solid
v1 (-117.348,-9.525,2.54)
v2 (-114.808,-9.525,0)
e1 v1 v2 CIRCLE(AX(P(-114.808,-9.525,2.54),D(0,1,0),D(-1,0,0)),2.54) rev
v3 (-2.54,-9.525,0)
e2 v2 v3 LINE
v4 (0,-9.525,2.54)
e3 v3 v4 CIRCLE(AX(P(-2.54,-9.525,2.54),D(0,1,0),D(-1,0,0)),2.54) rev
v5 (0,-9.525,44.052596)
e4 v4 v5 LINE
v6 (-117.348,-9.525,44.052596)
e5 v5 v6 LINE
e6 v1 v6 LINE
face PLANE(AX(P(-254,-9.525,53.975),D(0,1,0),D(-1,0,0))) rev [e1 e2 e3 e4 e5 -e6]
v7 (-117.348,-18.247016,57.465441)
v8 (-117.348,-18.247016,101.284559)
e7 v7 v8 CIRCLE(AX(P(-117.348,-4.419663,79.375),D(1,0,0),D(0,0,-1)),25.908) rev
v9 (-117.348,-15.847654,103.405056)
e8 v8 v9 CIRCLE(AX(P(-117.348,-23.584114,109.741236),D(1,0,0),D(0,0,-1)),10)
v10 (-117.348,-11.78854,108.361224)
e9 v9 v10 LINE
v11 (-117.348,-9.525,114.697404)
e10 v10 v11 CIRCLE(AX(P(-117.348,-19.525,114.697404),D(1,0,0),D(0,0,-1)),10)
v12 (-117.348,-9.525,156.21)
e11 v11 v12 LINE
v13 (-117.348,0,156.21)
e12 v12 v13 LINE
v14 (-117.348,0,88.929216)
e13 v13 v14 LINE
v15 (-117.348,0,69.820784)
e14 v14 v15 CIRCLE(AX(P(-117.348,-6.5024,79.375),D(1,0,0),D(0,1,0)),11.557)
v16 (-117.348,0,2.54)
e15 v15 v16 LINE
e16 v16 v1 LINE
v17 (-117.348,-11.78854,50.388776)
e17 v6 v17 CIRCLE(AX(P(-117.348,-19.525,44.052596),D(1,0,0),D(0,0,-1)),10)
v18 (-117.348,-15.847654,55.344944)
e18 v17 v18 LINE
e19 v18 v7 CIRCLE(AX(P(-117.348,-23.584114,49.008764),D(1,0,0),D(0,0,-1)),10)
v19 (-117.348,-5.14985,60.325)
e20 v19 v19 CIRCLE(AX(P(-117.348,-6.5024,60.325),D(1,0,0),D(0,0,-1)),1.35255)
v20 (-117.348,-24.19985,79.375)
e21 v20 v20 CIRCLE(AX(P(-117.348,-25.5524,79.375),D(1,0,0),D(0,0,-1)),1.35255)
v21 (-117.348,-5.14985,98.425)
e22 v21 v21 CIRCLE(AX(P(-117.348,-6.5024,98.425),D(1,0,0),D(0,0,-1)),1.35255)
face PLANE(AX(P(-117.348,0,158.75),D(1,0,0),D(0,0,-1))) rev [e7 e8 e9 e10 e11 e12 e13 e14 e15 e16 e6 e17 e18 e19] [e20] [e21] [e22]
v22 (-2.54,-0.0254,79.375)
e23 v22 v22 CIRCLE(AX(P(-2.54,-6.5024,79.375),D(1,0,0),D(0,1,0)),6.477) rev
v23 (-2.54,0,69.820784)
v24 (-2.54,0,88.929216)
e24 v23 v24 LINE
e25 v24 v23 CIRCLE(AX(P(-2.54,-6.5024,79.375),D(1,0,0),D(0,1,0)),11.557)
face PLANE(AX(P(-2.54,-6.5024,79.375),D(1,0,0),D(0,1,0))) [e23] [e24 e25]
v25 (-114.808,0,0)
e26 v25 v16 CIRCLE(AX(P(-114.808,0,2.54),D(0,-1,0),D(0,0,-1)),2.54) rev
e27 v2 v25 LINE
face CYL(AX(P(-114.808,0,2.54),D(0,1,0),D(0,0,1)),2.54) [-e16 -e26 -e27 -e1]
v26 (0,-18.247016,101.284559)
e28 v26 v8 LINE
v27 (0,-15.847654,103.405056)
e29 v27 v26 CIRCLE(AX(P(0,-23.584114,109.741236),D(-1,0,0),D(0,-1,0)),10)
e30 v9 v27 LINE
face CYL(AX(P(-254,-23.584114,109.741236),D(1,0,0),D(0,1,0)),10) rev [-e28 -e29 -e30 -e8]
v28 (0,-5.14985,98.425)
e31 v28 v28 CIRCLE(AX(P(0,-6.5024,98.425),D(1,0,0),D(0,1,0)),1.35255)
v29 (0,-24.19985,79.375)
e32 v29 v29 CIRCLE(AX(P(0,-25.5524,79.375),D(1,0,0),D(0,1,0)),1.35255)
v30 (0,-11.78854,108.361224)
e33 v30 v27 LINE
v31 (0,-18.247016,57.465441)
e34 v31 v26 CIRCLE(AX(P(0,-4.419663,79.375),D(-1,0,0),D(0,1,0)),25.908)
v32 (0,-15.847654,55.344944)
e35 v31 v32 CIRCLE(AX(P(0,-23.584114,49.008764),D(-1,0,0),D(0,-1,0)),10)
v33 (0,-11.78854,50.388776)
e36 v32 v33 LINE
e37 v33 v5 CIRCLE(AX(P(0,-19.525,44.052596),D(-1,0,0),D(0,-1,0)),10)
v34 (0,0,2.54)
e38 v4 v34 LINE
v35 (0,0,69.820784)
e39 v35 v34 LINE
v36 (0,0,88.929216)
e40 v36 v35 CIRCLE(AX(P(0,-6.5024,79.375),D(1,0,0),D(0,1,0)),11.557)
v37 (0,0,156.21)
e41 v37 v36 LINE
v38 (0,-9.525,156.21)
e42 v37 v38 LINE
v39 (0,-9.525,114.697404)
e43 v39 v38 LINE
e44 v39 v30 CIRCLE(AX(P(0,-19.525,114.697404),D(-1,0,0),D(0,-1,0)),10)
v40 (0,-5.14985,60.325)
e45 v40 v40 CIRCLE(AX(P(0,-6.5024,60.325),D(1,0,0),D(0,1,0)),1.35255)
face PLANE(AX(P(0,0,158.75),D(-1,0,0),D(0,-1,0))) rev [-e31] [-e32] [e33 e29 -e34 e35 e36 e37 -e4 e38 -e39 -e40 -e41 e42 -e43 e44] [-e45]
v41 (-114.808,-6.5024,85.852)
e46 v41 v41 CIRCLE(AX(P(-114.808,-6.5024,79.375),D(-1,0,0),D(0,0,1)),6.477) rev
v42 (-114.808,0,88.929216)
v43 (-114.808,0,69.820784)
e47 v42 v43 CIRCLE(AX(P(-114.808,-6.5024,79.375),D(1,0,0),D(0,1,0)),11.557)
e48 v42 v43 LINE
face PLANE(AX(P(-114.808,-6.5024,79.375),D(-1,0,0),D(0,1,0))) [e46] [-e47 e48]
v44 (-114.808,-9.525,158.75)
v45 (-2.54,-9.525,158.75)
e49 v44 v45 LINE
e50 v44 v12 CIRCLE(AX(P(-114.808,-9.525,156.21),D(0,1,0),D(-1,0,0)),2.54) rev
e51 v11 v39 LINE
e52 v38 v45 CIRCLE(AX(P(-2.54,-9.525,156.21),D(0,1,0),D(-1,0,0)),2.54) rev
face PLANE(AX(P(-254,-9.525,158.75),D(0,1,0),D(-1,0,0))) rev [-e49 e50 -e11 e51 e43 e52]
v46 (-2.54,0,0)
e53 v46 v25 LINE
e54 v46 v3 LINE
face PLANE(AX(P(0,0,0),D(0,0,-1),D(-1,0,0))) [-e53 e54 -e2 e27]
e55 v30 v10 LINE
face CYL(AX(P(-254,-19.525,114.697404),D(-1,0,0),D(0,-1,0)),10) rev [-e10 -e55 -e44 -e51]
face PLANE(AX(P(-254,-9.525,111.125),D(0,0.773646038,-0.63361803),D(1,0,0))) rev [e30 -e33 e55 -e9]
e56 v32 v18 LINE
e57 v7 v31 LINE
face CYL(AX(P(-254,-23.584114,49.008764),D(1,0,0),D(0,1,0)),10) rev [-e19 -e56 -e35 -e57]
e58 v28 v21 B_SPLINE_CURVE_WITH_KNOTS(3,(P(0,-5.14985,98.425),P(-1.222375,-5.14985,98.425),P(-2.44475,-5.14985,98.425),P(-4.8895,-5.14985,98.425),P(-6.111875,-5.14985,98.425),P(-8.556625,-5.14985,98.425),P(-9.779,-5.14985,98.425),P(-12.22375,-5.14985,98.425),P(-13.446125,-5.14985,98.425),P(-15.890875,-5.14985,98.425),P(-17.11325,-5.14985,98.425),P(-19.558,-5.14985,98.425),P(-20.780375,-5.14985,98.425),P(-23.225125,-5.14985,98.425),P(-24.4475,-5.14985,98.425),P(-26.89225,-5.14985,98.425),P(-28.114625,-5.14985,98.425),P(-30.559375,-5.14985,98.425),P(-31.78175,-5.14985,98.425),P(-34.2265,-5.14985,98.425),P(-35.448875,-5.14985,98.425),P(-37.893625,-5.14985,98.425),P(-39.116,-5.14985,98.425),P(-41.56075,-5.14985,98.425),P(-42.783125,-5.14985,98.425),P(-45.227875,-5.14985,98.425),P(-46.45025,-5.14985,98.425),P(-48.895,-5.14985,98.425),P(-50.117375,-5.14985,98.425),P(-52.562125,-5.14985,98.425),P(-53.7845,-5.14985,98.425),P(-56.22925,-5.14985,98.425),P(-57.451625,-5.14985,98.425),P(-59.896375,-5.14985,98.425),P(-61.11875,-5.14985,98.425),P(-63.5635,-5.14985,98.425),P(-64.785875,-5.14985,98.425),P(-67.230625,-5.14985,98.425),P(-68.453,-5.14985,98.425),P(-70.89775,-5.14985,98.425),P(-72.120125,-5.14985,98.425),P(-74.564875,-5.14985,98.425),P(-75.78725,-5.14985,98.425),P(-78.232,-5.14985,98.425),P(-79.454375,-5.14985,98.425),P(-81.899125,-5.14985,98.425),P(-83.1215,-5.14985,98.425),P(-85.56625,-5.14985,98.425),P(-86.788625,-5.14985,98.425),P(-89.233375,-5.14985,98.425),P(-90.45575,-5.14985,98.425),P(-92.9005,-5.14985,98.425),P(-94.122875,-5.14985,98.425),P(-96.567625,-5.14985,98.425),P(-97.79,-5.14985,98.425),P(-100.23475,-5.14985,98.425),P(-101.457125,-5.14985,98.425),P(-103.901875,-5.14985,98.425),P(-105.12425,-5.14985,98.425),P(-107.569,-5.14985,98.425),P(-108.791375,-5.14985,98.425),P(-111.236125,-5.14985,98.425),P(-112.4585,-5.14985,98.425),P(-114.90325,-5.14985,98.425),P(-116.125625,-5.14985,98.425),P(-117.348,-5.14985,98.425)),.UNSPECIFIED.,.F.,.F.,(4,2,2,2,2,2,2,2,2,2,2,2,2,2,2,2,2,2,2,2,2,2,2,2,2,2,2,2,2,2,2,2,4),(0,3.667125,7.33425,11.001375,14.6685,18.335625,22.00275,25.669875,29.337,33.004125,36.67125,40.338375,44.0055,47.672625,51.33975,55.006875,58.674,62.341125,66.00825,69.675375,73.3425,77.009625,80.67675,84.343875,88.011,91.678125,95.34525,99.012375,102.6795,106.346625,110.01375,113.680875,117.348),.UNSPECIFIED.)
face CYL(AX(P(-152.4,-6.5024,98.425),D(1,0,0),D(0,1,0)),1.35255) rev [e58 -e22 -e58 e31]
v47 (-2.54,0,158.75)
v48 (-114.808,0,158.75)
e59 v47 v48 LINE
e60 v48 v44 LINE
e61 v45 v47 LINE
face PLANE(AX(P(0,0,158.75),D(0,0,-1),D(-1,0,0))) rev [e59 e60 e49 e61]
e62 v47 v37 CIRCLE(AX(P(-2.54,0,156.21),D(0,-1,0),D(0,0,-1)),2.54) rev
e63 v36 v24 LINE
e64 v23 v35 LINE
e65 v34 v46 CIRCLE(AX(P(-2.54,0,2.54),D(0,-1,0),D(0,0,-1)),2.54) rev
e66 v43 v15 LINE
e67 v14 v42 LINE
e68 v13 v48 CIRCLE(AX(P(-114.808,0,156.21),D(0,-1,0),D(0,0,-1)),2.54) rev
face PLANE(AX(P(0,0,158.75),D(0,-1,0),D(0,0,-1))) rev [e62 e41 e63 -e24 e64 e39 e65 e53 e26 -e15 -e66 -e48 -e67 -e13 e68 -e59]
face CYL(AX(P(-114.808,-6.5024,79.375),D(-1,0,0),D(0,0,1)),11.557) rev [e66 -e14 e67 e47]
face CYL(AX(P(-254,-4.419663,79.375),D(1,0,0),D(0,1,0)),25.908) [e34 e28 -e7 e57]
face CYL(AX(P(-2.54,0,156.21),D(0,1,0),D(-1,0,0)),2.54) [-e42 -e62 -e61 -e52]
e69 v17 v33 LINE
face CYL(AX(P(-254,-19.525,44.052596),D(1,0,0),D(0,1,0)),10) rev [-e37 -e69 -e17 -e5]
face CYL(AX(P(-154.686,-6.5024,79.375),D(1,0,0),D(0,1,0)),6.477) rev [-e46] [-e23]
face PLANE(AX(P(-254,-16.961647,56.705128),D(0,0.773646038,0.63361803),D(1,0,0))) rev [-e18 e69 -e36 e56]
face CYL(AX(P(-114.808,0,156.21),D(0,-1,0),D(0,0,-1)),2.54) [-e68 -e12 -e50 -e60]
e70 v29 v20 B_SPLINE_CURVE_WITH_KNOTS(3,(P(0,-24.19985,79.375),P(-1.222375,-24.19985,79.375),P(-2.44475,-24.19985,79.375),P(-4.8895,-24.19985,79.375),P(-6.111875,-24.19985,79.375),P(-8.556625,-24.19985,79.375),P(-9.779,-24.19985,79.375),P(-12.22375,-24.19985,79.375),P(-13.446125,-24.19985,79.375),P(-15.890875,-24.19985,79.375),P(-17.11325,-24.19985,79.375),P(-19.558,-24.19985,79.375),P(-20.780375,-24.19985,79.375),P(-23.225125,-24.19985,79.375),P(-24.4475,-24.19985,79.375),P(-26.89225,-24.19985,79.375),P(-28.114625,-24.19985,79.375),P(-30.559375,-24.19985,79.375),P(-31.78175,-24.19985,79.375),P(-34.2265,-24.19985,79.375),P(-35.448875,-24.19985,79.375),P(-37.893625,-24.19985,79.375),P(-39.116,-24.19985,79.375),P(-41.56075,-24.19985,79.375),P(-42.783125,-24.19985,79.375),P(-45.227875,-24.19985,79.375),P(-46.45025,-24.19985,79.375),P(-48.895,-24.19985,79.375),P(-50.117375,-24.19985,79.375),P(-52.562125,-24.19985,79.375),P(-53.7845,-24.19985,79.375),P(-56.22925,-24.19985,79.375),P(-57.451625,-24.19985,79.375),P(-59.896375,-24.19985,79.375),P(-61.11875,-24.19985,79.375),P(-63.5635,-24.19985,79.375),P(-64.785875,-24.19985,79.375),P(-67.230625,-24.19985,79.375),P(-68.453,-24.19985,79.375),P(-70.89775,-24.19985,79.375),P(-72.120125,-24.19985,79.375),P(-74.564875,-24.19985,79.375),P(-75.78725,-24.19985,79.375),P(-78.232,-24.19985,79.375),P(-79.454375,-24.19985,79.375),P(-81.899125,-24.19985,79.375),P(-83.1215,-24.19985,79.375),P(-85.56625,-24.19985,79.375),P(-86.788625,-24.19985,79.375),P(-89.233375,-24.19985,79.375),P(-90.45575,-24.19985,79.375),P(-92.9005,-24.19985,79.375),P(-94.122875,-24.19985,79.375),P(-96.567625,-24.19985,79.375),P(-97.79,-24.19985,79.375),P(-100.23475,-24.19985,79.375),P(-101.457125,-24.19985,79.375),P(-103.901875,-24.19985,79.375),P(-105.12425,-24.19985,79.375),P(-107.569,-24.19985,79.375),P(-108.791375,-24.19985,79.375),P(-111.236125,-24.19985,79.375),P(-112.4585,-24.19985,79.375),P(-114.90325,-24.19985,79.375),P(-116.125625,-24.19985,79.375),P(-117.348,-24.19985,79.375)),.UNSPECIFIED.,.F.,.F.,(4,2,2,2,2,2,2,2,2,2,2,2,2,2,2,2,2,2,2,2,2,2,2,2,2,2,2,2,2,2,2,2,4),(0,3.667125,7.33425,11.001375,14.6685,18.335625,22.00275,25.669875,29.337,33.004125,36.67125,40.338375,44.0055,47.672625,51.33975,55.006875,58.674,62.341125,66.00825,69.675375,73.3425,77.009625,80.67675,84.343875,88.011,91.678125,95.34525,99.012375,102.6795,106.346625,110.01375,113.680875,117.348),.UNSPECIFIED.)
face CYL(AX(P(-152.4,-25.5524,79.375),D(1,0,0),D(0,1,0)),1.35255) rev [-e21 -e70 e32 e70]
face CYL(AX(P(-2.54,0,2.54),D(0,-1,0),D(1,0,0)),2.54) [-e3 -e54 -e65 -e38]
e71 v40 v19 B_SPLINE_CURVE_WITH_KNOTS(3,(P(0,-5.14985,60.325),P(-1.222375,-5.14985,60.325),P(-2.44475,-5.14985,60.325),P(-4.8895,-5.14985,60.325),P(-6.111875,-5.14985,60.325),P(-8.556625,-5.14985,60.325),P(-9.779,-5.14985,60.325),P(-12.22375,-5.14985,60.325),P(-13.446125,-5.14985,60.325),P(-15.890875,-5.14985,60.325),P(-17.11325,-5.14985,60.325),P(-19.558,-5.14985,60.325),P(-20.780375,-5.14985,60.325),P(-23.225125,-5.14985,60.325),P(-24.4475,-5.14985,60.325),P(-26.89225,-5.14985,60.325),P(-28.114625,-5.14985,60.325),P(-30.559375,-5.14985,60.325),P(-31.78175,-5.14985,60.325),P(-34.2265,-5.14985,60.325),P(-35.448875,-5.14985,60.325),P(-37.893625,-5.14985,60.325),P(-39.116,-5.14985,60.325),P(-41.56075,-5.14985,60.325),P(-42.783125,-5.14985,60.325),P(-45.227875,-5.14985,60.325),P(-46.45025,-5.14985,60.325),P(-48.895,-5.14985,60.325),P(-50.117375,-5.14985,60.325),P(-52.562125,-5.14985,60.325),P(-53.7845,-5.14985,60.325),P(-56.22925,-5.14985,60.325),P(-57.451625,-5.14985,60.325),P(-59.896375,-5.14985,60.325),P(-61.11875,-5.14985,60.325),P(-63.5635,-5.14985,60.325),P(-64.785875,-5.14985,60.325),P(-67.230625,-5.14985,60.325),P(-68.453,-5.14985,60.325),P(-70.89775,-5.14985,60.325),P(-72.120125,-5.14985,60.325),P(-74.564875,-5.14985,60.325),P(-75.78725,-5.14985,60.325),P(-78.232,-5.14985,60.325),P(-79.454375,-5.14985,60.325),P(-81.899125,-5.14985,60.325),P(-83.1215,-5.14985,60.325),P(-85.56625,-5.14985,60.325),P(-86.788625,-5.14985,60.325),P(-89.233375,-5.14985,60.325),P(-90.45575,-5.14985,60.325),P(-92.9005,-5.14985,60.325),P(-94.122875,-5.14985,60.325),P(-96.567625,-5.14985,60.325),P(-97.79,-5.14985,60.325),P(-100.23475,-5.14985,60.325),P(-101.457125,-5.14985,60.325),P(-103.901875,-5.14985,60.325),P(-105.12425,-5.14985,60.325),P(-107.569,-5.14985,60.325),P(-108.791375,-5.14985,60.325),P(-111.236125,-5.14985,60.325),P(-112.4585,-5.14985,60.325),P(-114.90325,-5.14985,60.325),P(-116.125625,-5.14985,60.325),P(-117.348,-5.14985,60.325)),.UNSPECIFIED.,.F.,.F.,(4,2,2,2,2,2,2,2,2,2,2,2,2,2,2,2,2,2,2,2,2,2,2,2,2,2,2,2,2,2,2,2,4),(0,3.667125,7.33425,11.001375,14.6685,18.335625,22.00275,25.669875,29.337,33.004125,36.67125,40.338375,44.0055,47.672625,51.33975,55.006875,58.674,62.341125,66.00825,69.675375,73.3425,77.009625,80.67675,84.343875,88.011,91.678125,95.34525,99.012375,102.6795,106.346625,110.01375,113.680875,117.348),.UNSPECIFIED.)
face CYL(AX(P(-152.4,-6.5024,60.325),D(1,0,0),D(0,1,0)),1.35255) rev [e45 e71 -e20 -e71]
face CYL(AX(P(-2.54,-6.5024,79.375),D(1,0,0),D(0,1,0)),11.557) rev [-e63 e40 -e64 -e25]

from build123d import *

# Parameters (mm, degrees)
SKETCH1_W           = 117.348
SKETCH1_H           = 38.1
BOSS_EXTRUDE1_DEPTH = 158.75
SKETCH2_R           = 1.35255
CUT_EXTRUDE1_DEPTH  = 152.4
SKETCH3_R           = 6.477
CUT_EXTRUDE4_DEPTH  = 154.686
SKETCH4_R           = 11.557
CUT_EXTRUDE5_DEPTH  = 2.54
CUT_EXTRUDE6_DEPTH  = 254
CHAMFER1_SIZE       = 6.35
FILLET1_R           = 10
FILLET2_R           = 2.54


with BuildPart() as part:
    # Sketch1 → Boss-Extrude1 (new body)
    with BuildSketch(Plane.XY):
        with Locations((-58.674, -19.05)):
            Rectangle(SKETCH1_W, SKETCH1_H)
    extrude(amount=BOSS_EXTRUDE1_DEPTH)

    # Sketch2 → Cut-Extrude1 (cut)
    with BuildSketch(Plane(origin=(0, 0, 0), x_dir=(0, 0, -1), z_dir=(1, 0, 0))):
        with Locations(Location((-98.425, -6.5024, 0), (0, 0, 90))):
            Circle(SKETCH2_R)
        with BuildLine():
            ThreePointArc((-78.02245, -25.5524), (-78.418602723, -24.596002723), (-79.375, -24.19985))
            Line((-79.375, -24.19985), (-79.375, -26.90495))
            ThreePointArc((-79.375, -26.90495), (-78.418602723, -26.508797277), (-78.02245, -25.5524))
        make_face()
        with BuildLine():
            Line((-79.375, -26.90495), (-79.375, -24.19985))
            ThreePointArc((-79.375, -24.19985), (-80.72755, -25.5524), (-79.375, -26.90495))
        make_face()
        with Locations(Location((-60.325, -6.5024, 0), (0, 0, 90))):
            Circle(SKETCH2_R)
    extrude(amount=-CUT_EXTRUDE1_DEPTH, mode=Mode.SUBTRACT)

    # Sketch3 → Cut-Extrude4 (cut)
    with BuildSketch(Plane(origin=(0, 0, 0), x_dir=(0, 0, -1), z_dir=(1, 0, 0))):
        with Locations(Location((-79.375, -6.5024, 0), (0, 0, 90))):
            Circle(SKETCH3_R)
    extrude(amount=-CUT_EXTRUDE4_DEPTH, mode=Mode.SUBTRACT)

    # Sketch4 → Cut-Extrude5 (cut)
    with BuildSketch(Plane(origin=(0, 0, 0), x_dir=(0, 0, -1), z_dir=(1, 0, 0))):
        with Locations((-79.375, -6.5024)):
            Circle(SKETCH4_R)
    cut_extrude5 = extrude(amount=-CUT_EXTRUDE5_DEPTH, mode=Mode.SUBTRACT)

    # Mirror1: Cut-Extrude5 across plane
    add(cut_extrude5.mirror(Plane(origin=(-58.674, 0, 0), x_dir=(0, 0, 1), z_dir=(1, 0, 0))), mode=Mode.SUBTRACT)

    # Sketch5 → Cut-Extrude6 (cut)
    with BuildSketch(Plane(origin=(0, 0, 0), x_dir=(0, 0, -1), z_dir=(1, 0, 0))):
        with BuildLine():
            Line((-158.75, -9.525), (-104.775, -9.525))
            ThreePointArc((-104.775, -9.525), (-79.375, -30.327663184), (-53.975, -9.525))
            Line((-53.975, -9.525), (0, -9.525))
            Line((0, -9.525), (0, -59.754484856))
            Line((0, -59.754484856), (-158.75, -59.754484856))
            Line((-158.75, -59.754484856), (-158.75, -9.525))
        make_face()
    extrude(amount=-CUT_EXTRUDE6_DEPTH, mode=Mode.SUBTRACT)

    # Chamfer1
    # the kernel refuses this chamfer: 6.35 mm, written as the material it adds along each edge
    with BuildSketch(Plane(origin=(0, -9.525, 104.775), x_dir=(0, -0.938739264670919, -0.3446281952555571), z_dir=(-1, 0, 0))) as chamfer1_piece_1:
        with BuildLine():
            Line((7.921952063, 0), (-CHAMFER1_SIZE * 0.344628195256, CHAMFER1_SIZE * 0.938739264671))
            Line((-CHAMFER1_SIZE * 0.344628195256, CHAMFER1_SIZE * 0.938739264671), (0, 0))
            ThreePointArc((0, 0), (4.071956682, 0.304341963), (7.921952063, 0))
        make_face()
    extrude(amount=117.348)
    with BuildSketch(Plane(origin=(0, -9.525, 53.975), x_dir=(0, 0, -1), z_dir=(-1, 0, 0))) as chamfer1_piece_2:
        with BuildLine():
            Line((CHAMFER1_SIZE, 0), (-2.730128042, 7.436647454))
            ThreePointArc((-2.730128042, 7.436647454), (-1.117613332, 3.927390442), (0, 0))
            Line((0, 0), (CHAMFER1_SIZE, 0))
        make_face()
    extrude(amount=117.348)

    # Fillet1
    fillet1_edges = [part.edges().sort_by_distance(p)[0] for p in [
        (-58.674, -9.525, 111.125),
        (-58.674, -16.961647454, 56.705128042),
        (-58.674, -16.961647454, 102.044871958),
        (-58.674, -9.525, 47.625),
    ]]
    fillet(fillet1_edges, radius=FILLET1_R)

    # Fillet2
    fillet2_edges = [part.edges().sort_by_distance(p)[0] for p in [
        (-117.348, -4.7625, 158.75),
        (-117.348, -4.7625, 0),
        (0, -4.7625, 0),
        (0, -4.7625, 158.75),
    ]]
    fillet(fillet2_edges, radius=FILLET2_R)


solid = part.part
